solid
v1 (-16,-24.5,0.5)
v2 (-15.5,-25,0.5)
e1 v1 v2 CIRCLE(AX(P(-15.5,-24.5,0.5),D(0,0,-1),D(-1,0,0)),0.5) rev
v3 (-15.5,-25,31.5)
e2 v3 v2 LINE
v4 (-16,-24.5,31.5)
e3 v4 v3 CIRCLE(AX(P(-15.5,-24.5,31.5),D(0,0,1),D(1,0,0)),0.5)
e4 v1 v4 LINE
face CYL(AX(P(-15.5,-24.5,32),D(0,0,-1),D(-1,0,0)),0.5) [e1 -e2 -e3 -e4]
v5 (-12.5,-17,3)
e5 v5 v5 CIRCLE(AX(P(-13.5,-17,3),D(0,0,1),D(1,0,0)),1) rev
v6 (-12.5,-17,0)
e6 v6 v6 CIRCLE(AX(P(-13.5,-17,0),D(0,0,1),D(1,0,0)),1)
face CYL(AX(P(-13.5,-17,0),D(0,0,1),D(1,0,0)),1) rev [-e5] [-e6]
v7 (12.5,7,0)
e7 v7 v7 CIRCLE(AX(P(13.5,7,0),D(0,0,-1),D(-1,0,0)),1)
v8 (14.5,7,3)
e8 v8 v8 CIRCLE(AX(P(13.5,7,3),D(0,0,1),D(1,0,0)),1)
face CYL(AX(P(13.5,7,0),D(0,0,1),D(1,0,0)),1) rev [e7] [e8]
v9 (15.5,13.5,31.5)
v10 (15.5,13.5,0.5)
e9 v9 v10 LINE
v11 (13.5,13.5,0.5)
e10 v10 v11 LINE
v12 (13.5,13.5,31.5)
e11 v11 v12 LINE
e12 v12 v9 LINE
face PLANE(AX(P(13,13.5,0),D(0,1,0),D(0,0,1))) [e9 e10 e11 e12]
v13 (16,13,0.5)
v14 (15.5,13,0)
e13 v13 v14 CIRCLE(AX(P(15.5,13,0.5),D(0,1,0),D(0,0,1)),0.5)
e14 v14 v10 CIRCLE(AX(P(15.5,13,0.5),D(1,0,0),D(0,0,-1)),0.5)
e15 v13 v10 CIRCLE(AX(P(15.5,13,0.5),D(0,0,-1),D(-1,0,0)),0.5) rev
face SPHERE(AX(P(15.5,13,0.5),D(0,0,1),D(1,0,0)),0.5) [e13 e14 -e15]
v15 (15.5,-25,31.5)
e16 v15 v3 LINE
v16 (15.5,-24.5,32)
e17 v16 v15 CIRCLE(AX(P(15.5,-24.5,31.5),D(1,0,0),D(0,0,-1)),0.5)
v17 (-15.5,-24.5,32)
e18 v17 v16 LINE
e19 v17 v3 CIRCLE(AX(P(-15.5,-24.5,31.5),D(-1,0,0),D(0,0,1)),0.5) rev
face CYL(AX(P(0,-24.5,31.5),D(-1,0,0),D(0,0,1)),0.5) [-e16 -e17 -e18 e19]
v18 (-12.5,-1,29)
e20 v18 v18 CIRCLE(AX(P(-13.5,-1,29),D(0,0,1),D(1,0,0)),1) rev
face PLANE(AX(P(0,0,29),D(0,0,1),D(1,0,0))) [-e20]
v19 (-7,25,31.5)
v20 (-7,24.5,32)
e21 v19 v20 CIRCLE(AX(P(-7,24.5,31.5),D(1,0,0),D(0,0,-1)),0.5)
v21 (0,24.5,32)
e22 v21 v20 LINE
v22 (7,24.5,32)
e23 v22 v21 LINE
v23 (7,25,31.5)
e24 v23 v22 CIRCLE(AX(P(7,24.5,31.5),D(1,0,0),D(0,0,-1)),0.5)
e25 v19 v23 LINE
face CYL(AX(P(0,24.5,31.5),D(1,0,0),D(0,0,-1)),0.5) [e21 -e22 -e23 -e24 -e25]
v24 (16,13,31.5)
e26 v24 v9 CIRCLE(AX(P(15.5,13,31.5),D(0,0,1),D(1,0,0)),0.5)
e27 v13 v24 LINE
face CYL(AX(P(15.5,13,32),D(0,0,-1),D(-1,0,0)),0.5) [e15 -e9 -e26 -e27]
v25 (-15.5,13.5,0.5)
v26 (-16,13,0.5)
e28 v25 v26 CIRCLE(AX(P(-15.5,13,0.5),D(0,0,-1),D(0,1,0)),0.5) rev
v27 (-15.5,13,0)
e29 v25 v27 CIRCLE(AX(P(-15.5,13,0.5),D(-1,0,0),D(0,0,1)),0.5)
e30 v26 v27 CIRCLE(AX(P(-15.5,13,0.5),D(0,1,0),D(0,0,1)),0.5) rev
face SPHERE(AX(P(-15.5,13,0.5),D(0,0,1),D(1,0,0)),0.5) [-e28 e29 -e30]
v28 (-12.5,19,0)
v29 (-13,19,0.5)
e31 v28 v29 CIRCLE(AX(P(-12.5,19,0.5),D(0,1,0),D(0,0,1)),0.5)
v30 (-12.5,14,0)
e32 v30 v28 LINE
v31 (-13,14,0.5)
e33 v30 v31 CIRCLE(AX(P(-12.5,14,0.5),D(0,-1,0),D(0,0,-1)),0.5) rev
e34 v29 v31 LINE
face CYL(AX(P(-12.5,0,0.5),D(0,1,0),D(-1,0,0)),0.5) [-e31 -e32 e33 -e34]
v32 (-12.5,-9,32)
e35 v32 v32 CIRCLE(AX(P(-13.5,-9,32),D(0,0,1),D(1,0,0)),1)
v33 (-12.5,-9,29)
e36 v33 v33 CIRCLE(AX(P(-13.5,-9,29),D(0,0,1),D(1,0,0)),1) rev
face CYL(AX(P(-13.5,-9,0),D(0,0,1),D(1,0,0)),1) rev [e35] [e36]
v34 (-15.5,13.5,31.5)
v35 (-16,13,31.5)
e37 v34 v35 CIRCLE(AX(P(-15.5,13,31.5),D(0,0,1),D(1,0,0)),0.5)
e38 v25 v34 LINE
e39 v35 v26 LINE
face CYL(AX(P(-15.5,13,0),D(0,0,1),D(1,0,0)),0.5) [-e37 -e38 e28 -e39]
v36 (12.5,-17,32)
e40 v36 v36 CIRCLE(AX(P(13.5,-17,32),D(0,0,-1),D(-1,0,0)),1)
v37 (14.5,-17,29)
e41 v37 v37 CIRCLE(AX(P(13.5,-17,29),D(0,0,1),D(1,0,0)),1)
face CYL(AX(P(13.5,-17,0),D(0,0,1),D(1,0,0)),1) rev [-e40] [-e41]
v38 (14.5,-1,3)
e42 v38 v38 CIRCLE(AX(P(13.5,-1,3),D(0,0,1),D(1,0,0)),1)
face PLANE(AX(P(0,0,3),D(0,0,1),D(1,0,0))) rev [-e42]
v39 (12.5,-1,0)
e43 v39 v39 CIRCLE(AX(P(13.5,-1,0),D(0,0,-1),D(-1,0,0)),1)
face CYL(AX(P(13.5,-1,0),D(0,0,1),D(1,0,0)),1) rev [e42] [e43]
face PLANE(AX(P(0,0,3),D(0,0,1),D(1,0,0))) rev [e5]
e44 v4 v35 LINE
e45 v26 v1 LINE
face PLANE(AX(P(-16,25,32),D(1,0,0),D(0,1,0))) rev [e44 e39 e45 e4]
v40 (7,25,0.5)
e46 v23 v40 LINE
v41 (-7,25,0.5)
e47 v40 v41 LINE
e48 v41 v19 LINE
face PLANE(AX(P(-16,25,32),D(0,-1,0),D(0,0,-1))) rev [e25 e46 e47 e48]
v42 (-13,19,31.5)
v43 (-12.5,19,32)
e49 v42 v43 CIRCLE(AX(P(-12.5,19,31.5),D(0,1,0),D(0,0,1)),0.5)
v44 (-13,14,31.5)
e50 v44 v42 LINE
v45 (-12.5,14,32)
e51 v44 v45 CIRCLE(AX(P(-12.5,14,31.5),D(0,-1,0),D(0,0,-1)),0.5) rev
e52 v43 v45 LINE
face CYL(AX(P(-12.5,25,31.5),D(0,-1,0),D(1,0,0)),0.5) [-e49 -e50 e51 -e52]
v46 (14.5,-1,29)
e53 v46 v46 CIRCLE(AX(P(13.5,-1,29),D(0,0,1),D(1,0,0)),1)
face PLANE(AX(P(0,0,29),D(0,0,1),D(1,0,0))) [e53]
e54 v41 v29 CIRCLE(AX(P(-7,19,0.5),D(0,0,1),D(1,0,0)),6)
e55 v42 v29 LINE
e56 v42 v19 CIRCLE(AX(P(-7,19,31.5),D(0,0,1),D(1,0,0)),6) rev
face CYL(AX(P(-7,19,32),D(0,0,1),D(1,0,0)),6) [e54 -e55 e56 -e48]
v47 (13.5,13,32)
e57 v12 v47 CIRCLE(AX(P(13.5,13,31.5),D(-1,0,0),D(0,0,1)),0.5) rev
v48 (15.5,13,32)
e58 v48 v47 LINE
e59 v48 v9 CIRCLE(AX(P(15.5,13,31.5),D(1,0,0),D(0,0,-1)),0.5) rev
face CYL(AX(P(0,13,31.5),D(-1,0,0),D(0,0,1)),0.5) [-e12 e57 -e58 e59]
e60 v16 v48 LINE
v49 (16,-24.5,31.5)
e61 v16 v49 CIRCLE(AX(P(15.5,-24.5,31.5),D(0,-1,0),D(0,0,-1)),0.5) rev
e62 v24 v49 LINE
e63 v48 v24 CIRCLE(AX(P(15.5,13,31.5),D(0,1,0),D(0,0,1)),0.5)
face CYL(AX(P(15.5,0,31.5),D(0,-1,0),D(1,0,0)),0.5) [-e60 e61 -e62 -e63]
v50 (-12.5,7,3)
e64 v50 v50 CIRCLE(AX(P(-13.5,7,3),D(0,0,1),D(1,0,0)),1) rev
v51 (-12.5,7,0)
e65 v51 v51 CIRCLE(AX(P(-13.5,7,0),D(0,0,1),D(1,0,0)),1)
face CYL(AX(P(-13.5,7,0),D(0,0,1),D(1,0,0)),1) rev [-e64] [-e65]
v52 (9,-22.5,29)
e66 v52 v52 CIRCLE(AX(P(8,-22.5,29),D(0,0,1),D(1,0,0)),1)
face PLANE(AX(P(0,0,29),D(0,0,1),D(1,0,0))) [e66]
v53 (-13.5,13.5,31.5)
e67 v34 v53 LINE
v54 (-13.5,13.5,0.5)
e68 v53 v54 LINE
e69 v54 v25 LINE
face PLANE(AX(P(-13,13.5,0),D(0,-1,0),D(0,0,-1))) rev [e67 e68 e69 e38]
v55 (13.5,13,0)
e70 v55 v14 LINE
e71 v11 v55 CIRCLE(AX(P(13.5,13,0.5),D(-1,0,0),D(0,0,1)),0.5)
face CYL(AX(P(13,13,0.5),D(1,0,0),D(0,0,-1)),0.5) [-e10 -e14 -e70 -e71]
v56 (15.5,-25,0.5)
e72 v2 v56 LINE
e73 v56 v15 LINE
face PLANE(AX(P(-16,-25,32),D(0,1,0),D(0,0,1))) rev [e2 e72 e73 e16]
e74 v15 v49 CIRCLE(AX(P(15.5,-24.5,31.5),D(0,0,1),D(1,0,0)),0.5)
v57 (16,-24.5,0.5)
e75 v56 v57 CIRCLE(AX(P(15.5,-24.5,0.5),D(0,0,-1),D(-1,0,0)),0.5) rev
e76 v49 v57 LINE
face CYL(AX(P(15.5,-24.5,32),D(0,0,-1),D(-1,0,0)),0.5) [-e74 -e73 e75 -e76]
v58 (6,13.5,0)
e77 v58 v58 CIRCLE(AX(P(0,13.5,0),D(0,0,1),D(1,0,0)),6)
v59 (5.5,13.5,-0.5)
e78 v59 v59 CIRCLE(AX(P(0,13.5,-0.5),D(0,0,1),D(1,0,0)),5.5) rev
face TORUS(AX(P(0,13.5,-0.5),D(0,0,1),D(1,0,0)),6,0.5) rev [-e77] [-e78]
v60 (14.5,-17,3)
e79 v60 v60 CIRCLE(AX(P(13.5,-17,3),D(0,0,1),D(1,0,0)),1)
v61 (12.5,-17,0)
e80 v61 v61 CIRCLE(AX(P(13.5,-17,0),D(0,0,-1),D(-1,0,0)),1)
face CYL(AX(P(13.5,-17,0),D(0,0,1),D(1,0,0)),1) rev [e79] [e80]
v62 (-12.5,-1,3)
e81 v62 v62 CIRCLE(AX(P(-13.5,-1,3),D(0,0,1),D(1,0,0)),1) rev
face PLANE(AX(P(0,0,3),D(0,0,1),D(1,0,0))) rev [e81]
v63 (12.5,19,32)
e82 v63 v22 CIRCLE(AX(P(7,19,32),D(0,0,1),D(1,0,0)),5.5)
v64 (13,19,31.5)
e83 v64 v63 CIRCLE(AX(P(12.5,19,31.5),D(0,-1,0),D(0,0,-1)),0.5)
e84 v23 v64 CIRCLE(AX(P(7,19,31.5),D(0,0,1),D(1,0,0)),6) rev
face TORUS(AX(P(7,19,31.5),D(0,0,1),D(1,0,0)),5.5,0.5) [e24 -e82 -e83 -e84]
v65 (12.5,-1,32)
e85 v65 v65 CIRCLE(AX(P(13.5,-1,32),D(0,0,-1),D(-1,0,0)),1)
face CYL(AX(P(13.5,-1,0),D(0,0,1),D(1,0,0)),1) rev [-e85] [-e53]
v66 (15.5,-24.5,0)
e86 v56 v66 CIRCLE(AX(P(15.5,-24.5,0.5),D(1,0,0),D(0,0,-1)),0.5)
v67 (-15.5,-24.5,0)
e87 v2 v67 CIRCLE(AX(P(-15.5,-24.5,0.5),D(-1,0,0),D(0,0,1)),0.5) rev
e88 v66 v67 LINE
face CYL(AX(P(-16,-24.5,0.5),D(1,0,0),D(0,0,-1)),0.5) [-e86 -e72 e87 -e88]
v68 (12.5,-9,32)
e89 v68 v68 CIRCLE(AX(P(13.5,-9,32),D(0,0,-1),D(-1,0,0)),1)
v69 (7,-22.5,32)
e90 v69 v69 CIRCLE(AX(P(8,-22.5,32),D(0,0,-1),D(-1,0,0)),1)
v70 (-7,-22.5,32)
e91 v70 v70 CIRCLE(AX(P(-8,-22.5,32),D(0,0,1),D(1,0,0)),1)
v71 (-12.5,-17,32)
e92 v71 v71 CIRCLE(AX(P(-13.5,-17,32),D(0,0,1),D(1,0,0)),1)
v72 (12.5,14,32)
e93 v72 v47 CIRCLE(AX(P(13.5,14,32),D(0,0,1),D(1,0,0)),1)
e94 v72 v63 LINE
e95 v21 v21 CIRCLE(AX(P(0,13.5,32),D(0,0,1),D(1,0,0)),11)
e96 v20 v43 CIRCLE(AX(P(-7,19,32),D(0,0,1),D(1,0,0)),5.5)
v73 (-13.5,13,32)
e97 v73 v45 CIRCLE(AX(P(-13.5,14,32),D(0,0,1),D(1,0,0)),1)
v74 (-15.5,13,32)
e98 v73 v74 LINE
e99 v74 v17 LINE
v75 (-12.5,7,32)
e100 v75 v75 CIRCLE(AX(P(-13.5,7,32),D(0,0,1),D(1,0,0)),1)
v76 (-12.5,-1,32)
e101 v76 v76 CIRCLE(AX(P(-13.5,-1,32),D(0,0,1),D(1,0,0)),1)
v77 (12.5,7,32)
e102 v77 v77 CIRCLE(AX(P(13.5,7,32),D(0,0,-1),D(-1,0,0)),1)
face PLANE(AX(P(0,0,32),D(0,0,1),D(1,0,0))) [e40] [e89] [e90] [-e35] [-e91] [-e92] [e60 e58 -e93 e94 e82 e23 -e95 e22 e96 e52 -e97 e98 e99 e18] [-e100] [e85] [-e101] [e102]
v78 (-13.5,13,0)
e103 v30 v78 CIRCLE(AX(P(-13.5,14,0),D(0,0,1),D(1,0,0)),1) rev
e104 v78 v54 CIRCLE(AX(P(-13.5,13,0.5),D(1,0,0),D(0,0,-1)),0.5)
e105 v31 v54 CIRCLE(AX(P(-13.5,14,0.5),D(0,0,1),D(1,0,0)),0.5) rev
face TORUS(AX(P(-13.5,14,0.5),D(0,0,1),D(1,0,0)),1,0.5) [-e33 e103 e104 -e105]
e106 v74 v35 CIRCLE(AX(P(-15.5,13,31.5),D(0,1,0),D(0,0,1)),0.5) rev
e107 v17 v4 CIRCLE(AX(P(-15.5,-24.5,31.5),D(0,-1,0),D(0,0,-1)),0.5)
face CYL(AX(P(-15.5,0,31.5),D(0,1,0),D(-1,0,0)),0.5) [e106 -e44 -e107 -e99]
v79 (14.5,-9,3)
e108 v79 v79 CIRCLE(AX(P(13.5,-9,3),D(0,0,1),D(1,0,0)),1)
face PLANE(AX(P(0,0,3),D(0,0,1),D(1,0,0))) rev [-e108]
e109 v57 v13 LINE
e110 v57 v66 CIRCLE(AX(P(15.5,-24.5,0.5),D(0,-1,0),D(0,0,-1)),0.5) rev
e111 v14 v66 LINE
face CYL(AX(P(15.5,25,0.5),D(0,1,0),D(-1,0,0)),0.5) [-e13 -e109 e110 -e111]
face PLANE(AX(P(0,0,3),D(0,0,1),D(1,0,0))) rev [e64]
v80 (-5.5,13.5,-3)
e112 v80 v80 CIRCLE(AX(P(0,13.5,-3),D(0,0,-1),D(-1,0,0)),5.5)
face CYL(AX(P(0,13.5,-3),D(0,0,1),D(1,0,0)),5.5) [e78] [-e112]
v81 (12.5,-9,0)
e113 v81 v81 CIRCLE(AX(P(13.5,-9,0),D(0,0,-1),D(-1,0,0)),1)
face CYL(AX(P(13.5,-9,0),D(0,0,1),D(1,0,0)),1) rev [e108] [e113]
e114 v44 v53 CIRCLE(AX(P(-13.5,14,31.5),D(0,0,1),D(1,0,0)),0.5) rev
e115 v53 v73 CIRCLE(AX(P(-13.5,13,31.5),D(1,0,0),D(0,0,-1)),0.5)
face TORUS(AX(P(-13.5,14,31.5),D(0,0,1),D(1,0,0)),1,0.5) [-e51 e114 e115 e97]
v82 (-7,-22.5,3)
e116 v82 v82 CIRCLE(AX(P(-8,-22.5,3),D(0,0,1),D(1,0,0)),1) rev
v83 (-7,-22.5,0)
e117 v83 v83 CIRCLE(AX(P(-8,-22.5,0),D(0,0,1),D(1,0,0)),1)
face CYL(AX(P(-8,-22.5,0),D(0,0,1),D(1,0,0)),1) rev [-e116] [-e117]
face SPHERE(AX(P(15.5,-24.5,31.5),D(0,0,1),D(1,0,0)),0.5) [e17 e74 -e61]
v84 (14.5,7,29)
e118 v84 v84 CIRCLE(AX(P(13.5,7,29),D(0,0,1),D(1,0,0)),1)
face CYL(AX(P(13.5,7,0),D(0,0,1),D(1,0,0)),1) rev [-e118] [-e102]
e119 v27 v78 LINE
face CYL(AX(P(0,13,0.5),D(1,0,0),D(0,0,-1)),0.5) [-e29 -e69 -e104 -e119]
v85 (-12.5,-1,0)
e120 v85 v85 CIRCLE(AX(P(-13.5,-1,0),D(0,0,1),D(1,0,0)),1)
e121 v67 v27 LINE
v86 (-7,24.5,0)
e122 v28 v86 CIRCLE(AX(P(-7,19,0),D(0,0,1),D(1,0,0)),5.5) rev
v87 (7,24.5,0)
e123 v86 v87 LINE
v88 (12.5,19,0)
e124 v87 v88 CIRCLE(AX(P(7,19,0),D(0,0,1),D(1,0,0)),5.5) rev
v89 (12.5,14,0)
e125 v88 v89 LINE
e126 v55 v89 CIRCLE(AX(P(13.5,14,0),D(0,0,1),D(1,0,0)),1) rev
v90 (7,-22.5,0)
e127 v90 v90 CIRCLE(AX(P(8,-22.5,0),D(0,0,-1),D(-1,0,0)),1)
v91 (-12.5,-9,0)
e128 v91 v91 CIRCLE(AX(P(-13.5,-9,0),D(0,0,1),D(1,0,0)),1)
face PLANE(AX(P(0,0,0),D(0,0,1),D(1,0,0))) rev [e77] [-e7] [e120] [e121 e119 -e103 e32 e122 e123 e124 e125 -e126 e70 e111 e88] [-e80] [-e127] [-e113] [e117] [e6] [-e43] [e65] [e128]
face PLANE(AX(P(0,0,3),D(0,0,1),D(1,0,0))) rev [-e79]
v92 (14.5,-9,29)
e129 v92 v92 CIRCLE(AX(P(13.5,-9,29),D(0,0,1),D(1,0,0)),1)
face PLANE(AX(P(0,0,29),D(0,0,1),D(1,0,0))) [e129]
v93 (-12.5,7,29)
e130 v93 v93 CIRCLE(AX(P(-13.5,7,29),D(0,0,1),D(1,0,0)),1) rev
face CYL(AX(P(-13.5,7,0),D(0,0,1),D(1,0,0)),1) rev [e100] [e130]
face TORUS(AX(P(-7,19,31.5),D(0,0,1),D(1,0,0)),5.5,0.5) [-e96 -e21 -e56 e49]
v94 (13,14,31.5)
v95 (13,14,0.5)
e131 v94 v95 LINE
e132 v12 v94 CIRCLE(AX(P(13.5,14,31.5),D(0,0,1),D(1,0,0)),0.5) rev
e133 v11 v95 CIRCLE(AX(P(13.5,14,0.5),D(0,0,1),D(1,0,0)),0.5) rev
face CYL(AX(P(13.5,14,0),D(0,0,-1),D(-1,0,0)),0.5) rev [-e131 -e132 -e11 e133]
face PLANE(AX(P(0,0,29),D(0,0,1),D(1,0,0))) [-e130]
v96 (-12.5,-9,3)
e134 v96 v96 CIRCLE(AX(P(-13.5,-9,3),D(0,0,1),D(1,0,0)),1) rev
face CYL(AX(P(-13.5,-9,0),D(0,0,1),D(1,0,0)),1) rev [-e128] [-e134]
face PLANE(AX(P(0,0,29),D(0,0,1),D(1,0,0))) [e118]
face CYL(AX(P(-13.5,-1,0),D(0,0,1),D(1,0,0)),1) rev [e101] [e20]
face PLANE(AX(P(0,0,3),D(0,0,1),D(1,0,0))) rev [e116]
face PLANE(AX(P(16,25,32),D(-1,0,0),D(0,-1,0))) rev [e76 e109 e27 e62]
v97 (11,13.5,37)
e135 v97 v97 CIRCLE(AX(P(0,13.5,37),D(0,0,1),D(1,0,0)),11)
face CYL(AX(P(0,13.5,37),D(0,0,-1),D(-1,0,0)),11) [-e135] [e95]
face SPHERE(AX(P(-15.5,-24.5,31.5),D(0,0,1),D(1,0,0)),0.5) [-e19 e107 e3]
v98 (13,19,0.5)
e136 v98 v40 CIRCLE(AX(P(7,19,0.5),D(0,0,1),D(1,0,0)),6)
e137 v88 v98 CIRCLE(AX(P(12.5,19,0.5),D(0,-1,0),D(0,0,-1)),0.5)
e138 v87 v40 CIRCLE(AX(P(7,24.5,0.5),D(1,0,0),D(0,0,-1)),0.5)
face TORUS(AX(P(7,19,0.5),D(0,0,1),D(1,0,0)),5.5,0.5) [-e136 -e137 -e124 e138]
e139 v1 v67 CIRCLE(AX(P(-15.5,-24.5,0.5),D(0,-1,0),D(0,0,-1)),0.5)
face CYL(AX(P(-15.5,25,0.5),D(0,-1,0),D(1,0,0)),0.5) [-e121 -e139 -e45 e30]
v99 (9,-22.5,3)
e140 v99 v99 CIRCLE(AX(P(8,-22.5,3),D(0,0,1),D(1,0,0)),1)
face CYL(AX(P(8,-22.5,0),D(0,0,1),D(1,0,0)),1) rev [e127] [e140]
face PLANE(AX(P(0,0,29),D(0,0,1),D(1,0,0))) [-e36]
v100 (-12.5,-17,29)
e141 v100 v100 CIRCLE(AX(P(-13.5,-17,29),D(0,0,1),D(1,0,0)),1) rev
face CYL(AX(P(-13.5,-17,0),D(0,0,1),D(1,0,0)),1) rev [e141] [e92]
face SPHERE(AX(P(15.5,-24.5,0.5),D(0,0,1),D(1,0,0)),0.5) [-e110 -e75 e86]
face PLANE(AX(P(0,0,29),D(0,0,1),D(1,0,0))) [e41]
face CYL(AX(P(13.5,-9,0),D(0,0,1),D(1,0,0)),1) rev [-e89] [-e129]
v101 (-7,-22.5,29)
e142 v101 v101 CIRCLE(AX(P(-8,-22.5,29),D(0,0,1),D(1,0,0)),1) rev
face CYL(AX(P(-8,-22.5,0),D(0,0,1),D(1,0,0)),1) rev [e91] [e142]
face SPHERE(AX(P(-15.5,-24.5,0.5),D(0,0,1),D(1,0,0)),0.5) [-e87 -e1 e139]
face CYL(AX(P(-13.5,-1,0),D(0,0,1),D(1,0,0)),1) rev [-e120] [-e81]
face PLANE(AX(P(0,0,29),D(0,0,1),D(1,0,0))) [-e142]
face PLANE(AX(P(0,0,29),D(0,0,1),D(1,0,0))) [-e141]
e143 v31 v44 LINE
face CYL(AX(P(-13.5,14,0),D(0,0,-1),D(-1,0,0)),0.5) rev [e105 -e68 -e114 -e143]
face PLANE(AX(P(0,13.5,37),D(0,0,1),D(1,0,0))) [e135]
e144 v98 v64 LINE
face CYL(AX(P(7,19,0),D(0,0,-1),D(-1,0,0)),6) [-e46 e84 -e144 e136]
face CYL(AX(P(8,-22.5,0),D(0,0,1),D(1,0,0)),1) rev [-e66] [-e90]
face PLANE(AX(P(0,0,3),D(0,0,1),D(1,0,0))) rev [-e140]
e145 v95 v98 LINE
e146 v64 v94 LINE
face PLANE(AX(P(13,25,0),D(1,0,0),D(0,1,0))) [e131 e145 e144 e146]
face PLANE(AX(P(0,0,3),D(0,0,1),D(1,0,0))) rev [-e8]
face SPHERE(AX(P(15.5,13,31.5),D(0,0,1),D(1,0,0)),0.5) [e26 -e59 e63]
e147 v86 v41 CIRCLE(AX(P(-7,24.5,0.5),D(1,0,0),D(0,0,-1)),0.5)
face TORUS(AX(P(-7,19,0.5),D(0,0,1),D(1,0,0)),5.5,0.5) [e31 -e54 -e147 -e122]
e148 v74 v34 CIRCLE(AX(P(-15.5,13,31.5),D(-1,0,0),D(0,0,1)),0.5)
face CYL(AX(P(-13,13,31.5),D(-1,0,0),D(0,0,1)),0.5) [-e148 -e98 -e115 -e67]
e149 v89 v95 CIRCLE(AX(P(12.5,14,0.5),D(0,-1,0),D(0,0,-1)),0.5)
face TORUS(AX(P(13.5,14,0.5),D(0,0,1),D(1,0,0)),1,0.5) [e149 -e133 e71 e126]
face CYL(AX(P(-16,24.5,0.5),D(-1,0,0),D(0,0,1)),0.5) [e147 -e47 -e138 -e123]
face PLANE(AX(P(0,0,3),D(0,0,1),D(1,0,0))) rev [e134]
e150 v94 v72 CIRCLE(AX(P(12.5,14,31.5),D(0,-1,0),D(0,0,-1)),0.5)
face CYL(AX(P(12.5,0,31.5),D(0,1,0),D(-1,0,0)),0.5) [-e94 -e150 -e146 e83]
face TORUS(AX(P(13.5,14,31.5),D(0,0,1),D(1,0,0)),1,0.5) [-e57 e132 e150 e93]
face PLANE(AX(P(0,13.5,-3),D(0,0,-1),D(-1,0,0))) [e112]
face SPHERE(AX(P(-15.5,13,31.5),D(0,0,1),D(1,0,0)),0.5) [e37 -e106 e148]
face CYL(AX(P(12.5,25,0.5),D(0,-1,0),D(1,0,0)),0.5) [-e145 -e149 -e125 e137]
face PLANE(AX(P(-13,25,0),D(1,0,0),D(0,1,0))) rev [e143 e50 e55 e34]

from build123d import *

# Parameters (mm, degrees)
IZIM1_W                          = 32
IZIM1_H                          = 50
Y_KSEKLIK_EKSTR_ZYON1_DEPTH      = 32
IZIM2_R                          = 1
IZIM2_W                          = 3
IZIM2_H                          = 11.5
KES_EKSTR_ZYON1_DEPTH            = 32
RADYUS2_R                        = 6
IZIM3_R                          = 11
Y_KSEKLIK_EKSTR_ZYON2_DEPTH      = 5
IZIM4_R                          = 5.5
Y_KSEKLIK_EKSTR_ZYON3_DEPTH      = 3
RADYUS3_R                        = 0.5
Y_KSEKLIK_EKSTR_ZYON4_DEPTH      = 13
Y_KSEKLIK_EKSTR_ZYON4_DEPTH_BACK = 13
IZIM5_W                          = 31
IZIM5_H                          = 37.5


with BuildPart() as part:
    # Çizim1 → Yükseklik-Ekstrüzyon1 (new body)
    with BuildSketch(Plane.XY):
        Rectangle(IZIM1_W, IZIM1_H)
    extrude(amount=Y_KSEKLIK_EKSTR_ZYON1_DEPTH)

    # Çizim2 → Kes-Ekstrüzyon1 (cut)
    with BuildSketch(Plane.XY.offset(32)):
        with Locations((-8, -22.5)):
            Circle(IZIM2_R)
        with Locations((-13.5, -17)):
            Circle(IZIM2_R)
        with Locations((-13.5, -9)):
            Circle(IZIM2_R)
        with Locations((-13.5, -1)):
            Circle(IZIM2_R)
        with Locations((-13.5, 7)):
            Circle(IZIM2_R)
        with Locations((-14.5, 19.25)):
            Rectangle(IZIM2_W, IZIM2_H)
    kes_ekstr_zyon1 = extrude(amount=-KES_EKSTR_ZYON1_DEPTH, mode=Mode.SUBTRACT)

    # Aynalama1: Kes-Ekstrüzyon1 across plane
    add(kes_ekstr_zyon1.mirror(Plane(origin=(0, 0, 0), x_dir=(0, 0, 1), z_dir=(1, 0, 0))), mode=Mode.SUBTRACT)

    # Radyus2
    radyus2_edges = [part.edges().sort_by_distance(p)[0] for p in [
        (-13, 25, 16),
        (13, 25, 16),
    ]]
    fillet(radyus2_edges, radius=RADYUS2_R)

    # Çizim3 → Yükseklik-Ekstrüzyon2 (add)
    with BuildSketch(Plane.XY.offset(32)):
        with Locations((0, 13.5)):
            Circle(IZIM3_R)
    extrude(amount=Y_KSEKLIK_EKSTR_ZYON2_DEPTH)

    # Çizim4 → Yükseklik-Ekstrüzyon3 (add)
    with BuildSketch(Plane(origin=(0, 0, 0), x_dir=(-1, 0, 0), z_dir=(0, 0, -1))):
        with Locations(Location((0, 13.5, 0), (0, 0, 180))):
            Circle(IZIM4_R)
    extrude(amount=Y_KSEKLIK_EKSTR_ZYON3_DEPTH)

    # Radyus3
    radyus3_edges = [part.edges().sort_by_distance(p)[0] for p in [
        (-5.5, 13.5, 0),
        (0, -25, 32),
        (-16, -5.75, 0),
        (-16, -5.75, 32),
        (-13, 16.25, 0),
        (-14.5, 13.5, 0),
        (-13, 13.5, 16),
        (-16, 13.5, 16),
        (-14.5, 13.5, 32),
        (-13, 16.25, 32),
        (16, -5.75, 32),
        (0, -25, 0),
        (16, -5.75, 0),
        (14.5, 13.5, 32),
        (16, 13.5, 16),
        (13, 16.25, 32),
        (13, 13.5, 16),
        (14.5, 13.5, 0),
        (13, 16.25, 0),
        (16, -25, 16),
        (-16, -25, 16),
        (0, 25, 32),
        (-11.242640687, 23.242640687, 32),
        (11.242640687, 23.242640687, 32),
        (0, 25, 0),
        (-11.242640687, 23.242640687, 0),
        (11.242640687, 23.242640687, 0),
    ]]
    fillet(radyus3_edges, radius=RADYUS3_R - 0.0001)  # a hair under: the kernel refuses the full size

    # Çizim5 → Yükseklik-Ekstrüzyon4 (add, two sides: drawn at the far end of the back side and taken through both)
    with BuildSketch(Plane.XY.offset(16).offset(-Y_KSEKLIK_EKSTR_ZYON4_DEPTH_BACK)):
        with Locations((0, -5.75)):
            Rectangle(IZIM5_W, IZIM5_H)
    extrude(amount=Y_KSEKLIK_EKSTR_ZYON4_DEPTH + Y_KSEKLIK_EKSTR_ZYON4_DEPTH_BACK)


solid = part.part
